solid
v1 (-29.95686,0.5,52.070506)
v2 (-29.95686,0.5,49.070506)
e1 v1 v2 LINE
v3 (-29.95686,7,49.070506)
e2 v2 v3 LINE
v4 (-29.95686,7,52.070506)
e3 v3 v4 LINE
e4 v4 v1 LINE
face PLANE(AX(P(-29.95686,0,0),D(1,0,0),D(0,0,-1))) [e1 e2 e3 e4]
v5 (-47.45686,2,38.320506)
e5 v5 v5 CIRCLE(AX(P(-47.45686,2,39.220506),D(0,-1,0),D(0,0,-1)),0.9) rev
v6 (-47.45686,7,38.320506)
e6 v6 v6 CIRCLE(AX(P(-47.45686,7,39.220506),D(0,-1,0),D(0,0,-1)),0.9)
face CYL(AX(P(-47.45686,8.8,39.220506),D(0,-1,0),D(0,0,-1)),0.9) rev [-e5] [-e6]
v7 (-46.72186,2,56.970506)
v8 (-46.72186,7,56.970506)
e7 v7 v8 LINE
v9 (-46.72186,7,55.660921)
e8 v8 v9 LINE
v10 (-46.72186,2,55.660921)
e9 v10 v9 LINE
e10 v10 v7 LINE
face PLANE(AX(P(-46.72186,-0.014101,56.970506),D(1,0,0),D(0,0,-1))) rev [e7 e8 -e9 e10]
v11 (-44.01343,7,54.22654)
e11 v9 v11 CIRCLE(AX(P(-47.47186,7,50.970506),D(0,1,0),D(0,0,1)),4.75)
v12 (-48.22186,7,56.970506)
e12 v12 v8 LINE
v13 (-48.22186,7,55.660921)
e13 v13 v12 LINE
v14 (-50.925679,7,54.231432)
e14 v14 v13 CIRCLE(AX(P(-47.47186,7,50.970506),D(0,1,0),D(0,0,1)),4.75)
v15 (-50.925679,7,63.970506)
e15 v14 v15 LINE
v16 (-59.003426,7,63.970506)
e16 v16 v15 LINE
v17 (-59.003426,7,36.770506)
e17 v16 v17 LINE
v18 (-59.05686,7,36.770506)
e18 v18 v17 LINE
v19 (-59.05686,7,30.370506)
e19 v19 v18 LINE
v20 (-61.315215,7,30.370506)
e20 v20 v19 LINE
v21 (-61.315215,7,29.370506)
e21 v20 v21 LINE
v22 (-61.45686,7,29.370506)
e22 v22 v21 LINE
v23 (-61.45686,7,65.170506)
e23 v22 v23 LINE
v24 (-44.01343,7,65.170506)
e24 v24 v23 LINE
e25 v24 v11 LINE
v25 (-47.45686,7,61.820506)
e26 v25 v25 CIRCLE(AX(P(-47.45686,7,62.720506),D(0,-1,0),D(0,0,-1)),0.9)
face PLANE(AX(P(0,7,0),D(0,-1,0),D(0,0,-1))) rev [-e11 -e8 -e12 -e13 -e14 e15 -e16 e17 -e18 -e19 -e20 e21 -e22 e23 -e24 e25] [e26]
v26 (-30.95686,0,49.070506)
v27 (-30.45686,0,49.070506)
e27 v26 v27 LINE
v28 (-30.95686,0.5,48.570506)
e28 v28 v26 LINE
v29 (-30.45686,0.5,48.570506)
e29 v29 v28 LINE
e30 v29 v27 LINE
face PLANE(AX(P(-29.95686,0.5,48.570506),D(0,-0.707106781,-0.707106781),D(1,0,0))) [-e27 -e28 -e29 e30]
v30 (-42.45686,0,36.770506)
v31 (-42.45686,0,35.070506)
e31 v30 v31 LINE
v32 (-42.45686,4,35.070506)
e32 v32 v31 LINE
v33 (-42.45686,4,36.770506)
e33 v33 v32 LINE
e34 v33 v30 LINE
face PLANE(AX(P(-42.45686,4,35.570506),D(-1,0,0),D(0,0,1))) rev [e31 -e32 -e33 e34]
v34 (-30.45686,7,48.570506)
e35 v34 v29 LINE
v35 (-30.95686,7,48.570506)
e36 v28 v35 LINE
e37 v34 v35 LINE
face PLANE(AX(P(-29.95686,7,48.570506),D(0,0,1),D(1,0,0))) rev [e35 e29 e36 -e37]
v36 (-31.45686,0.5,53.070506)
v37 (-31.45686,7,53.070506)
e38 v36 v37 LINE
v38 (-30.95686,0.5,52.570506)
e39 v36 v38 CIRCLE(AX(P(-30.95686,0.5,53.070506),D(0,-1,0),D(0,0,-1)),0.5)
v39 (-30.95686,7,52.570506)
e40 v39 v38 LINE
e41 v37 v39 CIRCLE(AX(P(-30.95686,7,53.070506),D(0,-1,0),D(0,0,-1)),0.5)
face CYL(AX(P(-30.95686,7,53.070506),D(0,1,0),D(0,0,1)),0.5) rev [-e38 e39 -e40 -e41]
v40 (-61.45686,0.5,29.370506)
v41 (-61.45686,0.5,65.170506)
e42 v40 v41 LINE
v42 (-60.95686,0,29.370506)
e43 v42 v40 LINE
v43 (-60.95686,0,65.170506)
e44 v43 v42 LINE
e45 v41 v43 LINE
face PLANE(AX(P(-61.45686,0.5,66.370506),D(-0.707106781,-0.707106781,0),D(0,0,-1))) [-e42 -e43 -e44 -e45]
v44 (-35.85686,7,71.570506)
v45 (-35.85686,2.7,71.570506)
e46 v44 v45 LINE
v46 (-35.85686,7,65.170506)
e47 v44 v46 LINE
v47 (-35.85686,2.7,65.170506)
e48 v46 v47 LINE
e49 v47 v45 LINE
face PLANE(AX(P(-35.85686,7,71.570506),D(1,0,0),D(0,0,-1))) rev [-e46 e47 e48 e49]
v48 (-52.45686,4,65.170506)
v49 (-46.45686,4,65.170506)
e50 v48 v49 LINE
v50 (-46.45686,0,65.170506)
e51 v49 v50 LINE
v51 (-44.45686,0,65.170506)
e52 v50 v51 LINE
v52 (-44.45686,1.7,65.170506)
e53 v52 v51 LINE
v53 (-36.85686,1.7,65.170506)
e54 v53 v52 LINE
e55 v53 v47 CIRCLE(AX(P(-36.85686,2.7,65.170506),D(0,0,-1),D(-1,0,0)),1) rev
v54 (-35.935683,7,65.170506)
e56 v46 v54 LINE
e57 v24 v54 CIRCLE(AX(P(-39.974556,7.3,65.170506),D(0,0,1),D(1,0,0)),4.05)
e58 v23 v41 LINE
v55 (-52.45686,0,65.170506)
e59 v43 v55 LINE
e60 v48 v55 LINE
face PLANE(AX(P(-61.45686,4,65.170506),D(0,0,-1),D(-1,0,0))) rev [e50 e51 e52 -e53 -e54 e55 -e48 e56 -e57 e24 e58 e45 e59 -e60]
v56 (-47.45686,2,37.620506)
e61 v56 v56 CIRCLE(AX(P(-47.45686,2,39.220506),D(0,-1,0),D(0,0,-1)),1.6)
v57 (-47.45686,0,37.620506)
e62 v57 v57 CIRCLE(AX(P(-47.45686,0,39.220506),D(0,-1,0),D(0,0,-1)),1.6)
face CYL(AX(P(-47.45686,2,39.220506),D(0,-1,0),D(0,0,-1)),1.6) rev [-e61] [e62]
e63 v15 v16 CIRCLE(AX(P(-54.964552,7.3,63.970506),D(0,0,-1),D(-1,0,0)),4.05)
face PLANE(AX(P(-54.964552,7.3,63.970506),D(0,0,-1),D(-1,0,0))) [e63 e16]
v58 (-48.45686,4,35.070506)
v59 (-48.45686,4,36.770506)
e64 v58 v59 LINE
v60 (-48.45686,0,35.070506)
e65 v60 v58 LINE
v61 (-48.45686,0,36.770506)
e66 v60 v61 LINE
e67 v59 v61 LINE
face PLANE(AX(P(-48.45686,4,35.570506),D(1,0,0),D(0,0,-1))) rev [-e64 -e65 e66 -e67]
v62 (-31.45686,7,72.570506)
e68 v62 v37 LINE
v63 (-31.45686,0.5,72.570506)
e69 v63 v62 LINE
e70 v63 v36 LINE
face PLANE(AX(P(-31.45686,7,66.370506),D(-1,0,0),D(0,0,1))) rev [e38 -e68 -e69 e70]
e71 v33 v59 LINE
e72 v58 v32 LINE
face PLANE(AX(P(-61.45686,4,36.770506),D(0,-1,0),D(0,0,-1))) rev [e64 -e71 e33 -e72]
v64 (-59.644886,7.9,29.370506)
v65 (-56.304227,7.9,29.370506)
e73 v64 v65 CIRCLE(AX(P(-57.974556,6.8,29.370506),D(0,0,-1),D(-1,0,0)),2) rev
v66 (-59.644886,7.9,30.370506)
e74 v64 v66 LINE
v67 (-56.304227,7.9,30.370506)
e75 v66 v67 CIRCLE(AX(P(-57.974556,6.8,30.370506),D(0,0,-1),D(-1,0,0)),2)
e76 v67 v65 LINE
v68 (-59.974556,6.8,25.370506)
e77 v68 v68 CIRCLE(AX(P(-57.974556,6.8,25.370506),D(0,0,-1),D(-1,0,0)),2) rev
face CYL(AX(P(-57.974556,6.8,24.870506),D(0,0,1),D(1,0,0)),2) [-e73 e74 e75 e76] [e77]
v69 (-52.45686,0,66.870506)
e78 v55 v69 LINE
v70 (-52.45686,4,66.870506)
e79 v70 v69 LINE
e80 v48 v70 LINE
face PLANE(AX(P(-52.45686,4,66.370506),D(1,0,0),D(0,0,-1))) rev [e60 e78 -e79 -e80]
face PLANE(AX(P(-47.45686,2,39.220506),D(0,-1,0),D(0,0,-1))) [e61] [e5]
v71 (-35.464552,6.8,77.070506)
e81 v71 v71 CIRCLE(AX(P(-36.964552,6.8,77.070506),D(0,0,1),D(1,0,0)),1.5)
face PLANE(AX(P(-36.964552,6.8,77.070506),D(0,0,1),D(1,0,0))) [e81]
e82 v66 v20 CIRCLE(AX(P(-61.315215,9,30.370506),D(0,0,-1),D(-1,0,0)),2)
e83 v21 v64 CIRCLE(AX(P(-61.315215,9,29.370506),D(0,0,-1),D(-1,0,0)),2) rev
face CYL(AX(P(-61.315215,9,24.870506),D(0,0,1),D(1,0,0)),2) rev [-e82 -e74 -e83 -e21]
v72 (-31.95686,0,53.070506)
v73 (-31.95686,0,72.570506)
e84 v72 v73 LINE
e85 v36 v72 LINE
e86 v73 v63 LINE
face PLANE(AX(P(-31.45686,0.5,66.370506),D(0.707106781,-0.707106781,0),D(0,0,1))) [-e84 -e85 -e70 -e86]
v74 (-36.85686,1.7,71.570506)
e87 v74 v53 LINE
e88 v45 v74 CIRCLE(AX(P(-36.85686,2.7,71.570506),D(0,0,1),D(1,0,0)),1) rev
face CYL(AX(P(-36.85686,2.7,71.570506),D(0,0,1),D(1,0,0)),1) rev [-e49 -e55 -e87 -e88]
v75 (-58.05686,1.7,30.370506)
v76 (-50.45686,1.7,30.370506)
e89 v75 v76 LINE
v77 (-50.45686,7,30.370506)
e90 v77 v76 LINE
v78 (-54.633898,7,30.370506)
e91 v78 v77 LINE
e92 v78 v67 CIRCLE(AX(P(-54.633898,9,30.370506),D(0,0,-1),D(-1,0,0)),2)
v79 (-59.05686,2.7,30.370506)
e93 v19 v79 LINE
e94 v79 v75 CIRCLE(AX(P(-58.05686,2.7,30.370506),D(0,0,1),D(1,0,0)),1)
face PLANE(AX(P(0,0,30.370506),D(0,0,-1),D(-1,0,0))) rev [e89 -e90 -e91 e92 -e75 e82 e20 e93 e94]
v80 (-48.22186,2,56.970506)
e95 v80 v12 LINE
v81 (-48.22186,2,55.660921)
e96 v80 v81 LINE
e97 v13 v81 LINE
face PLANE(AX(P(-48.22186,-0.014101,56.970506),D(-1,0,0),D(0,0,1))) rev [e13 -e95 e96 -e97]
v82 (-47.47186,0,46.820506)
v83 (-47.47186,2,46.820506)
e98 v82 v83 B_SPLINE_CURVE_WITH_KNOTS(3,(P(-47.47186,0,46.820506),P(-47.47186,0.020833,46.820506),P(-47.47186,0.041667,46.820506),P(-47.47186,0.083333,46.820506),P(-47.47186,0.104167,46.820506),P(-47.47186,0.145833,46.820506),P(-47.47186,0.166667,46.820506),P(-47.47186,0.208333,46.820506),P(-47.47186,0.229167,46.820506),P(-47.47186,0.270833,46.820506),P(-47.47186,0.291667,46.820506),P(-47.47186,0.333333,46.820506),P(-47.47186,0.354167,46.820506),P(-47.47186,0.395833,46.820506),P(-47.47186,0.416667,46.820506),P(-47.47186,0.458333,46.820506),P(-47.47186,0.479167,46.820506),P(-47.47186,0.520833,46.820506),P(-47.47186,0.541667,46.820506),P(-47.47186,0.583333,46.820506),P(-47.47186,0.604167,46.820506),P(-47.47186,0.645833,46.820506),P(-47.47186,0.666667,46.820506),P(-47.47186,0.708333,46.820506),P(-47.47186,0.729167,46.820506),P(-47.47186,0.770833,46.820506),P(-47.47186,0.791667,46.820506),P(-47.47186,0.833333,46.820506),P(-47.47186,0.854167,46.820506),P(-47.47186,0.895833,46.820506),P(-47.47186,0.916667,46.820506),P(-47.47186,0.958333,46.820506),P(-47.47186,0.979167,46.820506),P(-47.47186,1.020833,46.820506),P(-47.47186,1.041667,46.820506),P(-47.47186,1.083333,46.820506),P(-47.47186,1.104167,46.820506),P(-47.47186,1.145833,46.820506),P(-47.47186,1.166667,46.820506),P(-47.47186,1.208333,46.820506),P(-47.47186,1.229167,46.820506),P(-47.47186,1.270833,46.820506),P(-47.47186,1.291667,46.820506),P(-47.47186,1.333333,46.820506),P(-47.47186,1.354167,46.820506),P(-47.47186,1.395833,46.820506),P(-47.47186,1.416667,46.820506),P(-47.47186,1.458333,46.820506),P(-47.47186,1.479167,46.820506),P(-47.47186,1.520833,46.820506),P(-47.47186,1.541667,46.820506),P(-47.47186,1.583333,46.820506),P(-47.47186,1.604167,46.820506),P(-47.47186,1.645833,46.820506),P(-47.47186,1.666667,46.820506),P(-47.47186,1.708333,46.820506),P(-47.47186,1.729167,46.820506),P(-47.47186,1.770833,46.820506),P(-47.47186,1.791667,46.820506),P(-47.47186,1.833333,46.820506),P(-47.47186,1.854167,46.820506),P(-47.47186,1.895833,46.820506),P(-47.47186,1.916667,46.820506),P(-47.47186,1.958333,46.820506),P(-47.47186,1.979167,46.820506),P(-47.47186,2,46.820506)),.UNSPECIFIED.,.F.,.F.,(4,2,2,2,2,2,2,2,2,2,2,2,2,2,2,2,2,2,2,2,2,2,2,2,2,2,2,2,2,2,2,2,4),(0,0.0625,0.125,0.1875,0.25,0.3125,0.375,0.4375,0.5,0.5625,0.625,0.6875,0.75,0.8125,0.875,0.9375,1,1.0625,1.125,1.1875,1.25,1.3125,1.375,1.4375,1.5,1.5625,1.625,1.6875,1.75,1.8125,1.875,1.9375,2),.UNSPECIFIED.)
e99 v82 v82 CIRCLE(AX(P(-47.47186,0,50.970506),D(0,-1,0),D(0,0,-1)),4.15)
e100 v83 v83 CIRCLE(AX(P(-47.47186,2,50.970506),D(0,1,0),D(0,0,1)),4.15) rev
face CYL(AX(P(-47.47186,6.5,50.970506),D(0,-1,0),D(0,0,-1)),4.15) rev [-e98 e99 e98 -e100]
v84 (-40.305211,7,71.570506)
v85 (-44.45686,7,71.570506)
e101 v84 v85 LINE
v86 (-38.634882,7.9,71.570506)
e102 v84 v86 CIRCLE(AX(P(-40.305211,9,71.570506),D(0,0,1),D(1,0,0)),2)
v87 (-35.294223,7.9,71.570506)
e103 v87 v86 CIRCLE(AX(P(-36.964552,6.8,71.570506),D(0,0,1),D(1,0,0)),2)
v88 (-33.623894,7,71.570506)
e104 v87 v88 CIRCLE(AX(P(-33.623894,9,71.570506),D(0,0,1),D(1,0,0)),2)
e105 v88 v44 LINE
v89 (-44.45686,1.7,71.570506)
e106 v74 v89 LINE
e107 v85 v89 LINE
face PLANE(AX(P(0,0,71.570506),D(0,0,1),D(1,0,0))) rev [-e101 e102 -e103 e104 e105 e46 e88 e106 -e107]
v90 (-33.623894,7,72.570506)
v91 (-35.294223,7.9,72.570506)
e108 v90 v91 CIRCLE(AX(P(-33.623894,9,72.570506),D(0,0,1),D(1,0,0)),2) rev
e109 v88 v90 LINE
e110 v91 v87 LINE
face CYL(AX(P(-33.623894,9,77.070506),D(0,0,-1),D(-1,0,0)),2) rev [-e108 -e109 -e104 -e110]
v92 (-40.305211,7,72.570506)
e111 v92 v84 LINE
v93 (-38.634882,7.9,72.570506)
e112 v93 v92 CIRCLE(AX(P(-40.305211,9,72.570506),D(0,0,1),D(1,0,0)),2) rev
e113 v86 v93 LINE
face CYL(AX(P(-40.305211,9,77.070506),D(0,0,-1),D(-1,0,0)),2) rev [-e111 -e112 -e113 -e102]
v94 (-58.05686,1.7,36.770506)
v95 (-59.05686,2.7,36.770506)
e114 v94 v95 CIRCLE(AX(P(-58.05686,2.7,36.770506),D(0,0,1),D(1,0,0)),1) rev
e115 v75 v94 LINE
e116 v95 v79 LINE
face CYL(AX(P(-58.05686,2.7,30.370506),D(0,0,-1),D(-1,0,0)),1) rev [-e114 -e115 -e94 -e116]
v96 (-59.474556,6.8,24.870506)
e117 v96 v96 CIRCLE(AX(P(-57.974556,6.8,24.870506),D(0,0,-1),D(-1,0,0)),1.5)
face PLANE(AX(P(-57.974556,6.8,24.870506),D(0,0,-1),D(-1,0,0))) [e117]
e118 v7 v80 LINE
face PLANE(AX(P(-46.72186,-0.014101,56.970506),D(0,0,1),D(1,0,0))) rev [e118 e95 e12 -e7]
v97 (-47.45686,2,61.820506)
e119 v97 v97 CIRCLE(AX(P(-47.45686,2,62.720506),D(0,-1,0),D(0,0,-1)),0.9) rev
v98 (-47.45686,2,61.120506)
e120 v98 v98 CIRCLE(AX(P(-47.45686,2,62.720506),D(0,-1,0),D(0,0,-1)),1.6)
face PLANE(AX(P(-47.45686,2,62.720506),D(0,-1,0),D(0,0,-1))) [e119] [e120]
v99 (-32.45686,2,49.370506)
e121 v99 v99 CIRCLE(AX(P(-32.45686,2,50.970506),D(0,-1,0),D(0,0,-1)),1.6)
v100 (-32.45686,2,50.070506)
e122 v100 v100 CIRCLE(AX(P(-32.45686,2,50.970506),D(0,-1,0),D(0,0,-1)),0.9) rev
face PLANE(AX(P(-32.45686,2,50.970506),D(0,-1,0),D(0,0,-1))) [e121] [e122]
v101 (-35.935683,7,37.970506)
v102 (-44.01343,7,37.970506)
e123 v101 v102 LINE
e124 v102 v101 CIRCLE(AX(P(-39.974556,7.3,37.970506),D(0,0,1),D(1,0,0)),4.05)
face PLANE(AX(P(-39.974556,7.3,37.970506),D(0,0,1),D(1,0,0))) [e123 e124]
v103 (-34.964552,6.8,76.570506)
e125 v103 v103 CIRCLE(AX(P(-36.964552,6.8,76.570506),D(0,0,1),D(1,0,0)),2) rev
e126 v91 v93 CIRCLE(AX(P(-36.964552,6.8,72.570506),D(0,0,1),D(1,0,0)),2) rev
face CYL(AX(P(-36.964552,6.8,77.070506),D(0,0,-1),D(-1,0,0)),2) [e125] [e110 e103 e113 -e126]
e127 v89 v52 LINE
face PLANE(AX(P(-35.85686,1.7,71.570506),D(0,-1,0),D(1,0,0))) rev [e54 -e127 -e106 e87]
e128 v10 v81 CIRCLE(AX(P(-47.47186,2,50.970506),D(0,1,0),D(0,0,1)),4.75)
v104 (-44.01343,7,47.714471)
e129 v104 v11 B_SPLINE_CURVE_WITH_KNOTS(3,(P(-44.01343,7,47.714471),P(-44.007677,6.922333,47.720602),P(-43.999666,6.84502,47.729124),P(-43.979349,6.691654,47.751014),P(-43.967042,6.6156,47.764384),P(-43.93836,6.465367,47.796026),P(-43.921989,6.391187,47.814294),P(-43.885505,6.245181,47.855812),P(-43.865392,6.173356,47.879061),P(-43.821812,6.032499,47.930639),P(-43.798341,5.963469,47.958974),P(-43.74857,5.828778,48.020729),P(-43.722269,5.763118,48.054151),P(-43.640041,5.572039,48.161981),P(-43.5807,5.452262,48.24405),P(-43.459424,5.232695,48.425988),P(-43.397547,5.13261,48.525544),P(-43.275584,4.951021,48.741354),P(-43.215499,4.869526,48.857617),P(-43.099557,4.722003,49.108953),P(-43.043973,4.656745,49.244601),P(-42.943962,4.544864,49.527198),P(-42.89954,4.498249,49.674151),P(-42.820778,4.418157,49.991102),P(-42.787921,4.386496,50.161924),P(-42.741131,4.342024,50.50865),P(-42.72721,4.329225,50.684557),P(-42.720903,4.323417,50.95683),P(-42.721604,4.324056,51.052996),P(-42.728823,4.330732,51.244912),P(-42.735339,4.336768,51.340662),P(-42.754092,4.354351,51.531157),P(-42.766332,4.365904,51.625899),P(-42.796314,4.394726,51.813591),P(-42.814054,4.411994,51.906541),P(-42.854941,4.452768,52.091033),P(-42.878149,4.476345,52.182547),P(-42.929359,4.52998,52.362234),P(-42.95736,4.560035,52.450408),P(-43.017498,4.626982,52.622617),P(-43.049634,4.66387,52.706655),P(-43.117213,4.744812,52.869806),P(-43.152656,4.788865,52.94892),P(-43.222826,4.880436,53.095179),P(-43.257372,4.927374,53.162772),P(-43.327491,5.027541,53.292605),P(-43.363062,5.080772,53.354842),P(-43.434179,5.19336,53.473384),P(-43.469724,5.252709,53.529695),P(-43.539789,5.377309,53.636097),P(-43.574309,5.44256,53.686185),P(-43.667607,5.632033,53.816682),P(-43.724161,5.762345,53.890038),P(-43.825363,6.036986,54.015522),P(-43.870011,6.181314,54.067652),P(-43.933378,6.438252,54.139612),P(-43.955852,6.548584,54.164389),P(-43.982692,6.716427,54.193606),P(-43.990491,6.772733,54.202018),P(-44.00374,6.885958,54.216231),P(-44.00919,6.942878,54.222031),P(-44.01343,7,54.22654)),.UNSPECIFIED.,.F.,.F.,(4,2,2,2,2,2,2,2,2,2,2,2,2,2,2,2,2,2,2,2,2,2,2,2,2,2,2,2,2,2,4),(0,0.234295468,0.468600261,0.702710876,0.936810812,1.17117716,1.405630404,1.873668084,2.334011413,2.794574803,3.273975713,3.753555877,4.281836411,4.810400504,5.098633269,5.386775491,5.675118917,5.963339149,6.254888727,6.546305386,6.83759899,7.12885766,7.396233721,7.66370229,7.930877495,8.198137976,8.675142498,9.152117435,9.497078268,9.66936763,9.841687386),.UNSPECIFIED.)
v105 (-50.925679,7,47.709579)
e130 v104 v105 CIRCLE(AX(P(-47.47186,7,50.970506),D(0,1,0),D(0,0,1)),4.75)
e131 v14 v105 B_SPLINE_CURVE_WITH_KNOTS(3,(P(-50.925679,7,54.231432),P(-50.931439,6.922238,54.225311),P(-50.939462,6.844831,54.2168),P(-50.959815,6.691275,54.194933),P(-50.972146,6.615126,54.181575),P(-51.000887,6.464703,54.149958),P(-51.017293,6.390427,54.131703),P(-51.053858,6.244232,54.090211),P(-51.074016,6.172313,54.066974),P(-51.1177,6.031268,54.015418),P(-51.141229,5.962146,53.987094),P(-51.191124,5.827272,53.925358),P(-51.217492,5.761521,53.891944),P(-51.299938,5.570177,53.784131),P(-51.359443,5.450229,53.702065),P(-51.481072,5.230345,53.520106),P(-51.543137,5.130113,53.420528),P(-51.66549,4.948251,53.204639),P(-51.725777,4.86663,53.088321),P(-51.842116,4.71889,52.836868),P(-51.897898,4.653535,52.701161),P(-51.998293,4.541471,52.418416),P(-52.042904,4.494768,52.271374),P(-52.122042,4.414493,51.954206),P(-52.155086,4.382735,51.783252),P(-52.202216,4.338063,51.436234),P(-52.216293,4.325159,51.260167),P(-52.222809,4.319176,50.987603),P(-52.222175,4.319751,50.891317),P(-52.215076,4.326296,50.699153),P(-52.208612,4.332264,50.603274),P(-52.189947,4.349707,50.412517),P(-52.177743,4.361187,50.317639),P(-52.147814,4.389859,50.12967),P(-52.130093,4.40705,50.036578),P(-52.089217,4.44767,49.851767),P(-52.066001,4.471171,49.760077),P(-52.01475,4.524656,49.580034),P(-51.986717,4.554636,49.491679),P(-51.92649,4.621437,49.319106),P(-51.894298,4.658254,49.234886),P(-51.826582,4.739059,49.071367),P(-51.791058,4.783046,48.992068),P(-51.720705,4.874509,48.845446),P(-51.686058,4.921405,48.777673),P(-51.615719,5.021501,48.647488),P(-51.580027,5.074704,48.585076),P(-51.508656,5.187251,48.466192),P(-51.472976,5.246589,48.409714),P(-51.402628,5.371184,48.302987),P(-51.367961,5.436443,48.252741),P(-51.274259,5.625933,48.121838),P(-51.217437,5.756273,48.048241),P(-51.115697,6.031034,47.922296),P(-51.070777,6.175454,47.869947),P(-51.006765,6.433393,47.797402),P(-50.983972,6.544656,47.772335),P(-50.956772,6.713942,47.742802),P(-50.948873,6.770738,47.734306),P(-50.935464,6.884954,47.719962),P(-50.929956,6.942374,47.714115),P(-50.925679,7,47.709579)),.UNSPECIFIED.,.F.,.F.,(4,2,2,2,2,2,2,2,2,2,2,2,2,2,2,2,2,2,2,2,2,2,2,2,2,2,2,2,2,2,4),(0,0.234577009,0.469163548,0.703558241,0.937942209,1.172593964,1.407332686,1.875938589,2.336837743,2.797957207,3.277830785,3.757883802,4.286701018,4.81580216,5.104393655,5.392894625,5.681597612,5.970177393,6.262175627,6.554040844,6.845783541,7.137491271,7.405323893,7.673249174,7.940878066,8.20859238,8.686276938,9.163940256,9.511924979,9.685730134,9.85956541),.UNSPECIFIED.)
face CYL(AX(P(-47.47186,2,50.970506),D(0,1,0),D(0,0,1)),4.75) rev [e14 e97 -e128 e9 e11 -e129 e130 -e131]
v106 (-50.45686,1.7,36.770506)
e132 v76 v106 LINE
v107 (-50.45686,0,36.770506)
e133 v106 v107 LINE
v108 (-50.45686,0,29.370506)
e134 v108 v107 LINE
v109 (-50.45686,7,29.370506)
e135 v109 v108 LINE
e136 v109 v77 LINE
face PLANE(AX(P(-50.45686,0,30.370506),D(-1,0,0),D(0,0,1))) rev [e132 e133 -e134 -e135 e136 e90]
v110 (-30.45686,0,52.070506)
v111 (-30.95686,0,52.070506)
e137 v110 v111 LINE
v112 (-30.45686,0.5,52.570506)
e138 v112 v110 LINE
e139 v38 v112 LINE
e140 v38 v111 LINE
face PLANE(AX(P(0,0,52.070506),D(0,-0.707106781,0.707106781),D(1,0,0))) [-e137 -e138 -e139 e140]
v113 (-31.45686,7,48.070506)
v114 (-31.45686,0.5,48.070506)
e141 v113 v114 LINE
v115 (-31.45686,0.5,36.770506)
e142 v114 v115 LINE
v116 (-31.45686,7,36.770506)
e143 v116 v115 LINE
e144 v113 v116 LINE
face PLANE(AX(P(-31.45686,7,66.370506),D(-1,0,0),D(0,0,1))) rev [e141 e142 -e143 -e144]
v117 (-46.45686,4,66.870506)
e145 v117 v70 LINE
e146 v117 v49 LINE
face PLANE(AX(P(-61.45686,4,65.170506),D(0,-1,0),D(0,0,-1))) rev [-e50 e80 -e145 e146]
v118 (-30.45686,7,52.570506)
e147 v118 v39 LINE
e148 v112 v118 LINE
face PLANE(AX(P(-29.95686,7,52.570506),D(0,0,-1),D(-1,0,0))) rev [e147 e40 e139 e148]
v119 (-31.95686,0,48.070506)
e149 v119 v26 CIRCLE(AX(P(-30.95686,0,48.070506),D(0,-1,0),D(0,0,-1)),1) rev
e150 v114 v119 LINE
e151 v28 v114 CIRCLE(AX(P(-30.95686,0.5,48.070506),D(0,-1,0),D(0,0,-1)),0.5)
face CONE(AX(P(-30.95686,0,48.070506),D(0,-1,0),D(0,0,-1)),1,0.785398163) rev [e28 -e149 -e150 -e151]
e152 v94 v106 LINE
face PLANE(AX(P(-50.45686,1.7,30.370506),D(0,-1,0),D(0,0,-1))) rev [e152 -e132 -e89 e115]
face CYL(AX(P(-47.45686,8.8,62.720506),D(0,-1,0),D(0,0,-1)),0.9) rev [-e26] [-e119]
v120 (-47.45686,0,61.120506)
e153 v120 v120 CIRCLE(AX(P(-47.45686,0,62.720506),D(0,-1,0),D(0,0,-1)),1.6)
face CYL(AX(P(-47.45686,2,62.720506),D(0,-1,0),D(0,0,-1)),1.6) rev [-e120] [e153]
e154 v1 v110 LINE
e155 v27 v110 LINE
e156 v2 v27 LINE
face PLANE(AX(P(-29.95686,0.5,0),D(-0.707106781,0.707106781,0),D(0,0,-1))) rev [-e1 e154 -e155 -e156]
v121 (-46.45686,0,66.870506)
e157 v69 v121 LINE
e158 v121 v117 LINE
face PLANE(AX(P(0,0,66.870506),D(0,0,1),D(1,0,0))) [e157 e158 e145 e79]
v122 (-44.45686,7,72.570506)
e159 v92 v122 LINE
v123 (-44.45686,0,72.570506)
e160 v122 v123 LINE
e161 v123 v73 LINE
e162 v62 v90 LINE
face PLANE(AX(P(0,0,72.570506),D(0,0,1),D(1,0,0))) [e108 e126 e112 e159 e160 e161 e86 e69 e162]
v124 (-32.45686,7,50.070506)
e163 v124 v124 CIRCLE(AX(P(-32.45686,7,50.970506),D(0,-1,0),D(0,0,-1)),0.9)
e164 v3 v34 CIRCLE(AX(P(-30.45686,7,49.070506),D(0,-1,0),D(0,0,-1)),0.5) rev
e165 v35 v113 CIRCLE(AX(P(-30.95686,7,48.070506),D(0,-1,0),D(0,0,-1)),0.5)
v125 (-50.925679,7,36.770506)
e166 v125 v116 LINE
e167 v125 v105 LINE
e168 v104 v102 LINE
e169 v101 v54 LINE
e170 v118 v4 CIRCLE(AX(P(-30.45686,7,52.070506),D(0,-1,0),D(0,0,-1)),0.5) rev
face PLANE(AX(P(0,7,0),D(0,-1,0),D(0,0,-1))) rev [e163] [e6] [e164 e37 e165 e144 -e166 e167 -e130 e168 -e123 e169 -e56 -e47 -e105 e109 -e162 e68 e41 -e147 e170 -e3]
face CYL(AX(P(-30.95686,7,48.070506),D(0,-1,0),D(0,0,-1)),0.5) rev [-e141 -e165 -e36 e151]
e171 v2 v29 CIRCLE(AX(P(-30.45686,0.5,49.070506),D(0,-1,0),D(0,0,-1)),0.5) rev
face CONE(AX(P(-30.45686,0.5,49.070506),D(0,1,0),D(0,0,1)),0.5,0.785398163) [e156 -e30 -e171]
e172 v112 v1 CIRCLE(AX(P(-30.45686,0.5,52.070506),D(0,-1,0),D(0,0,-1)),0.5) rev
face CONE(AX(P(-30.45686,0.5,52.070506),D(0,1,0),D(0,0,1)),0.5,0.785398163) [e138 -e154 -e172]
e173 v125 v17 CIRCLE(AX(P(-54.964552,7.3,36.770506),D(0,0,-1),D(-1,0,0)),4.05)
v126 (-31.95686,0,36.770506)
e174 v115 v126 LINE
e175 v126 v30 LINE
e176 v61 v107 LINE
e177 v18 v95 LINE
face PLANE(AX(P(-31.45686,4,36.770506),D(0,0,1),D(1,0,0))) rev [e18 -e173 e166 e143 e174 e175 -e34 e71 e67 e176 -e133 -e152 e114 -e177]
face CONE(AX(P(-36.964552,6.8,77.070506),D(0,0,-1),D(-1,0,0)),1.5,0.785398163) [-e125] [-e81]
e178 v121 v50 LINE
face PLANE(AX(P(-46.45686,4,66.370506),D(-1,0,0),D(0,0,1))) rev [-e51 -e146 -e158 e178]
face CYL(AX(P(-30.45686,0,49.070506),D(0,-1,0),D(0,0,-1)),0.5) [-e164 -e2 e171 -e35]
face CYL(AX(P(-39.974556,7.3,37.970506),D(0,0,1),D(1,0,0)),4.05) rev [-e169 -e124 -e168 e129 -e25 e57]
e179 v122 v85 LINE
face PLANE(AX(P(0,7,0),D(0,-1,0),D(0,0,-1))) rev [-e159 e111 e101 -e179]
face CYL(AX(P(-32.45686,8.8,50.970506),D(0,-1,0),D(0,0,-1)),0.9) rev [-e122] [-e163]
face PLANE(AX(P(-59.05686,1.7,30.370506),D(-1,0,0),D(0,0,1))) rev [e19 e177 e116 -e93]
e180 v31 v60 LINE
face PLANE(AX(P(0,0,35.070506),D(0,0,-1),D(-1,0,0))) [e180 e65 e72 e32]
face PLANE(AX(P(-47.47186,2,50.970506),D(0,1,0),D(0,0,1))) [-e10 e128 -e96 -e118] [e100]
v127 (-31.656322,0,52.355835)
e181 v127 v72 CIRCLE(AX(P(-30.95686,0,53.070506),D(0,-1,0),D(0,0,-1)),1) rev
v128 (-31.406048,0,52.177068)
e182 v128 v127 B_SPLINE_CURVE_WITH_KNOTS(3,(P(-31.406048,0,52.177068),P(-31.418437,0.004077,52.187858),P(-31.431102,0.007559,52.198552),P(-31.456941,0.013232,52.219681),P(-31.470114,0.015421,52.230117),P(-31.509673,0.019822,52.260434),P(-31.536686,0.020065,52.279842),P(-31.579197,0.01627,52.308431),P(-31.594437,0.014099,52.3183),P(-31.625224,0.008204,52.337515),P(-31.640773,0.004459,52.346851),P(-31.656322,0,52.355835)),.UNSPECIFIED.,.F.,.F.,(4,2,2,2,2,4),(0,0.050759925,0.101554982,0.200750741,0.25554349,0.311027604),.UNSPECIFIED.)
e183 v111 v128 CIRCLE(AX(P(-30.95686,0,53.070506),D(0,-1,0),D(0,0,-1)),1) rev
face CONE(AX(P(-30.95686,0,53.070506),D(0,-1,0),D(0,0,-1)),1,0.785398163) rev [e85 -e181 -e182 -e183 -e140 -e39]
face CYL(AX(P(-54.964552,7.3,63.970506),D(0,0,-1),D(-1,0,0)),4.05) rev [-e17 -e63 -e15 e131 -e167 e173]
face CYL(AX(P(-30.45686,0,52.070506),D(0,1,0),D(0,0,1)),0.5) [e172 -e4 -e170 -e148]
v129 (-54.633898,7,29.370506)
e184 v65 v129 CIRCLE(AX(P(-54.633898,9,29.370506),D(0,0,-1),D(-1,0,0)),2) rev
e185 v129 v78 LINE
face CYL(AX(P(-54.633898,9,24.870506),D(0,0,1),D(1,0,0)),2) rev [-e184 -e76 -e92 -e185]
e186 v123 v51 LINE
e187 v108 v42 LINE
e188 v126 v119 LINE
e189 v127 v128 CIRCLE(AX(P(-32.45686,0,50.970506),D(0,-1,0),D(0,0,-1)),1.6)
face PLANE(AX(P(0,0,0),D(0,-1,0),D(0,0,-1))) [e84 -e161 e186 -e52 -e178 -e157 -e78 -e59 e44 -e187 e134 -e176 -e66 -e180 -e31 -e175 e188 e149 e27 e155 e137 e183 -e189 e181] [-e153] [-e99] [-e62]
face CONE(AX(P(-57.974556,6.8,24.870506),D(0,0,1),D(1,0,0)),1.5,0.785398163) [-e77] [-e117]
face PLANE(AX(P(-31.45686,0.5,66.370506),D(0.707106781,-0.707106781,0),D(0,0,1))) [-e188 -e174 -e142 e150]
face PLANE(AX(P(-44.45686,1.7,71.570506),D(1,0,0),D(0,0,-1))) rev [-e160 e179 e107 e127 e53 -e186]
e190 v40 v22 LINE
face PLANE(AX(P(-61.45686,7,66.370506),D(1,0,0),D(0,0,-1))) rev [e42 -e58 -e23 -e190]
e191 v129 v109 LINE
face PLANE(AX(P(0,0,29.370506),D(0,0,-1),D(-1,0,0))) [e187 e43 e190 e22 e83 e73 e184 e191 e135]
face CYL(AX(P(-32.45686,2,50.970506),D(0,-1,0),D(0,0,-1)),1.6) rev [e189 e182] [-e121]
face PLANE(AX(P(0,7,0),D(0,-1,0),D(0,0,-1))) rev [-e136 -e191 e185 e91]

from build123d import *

# Parameters (mm, degrees)
SKETCH1_W            = 30
SKETCH1_H            = 30.8
BOSS_EXTRUDE1_DEPTH  = 7
SKETCH2_R            = 4.15
CUT_EXTRUDE1_DEPTH   = 6.5
SKETCH3_W            = 15
SKETCH3_H            = 1.2
SKETCH3_W_2          = 9
SKETCH3_W_3          = 11
SKETCH3_W_4          = 13
CUT_EXTRUDE2_DEPTH   = 4
SKETCH4_W            = 30
SKETCH4_H            = 3
CUT_EXTRUDE3_DEPTH   = 1.2
SKETCH5_W            = 30
SKETCH5_H            = 3
CUT_EXTRUDE4_DEPTH   = 1.2
SKETCH6_R            = 4.05
CUT_EXTRUDE5_DEPTH   = 27.2
SKETCH7_R            = 4.05
CUT_EXTRUDE6_DEPTH   = 27.2
SKETCH8_R            = 4.75
CUT_EXTRUDE7_DEPTH   = 5
BOSS_EXTRUDE2_DEPTH  = 6.4
FILLET1_R            = 1
BOSS_EXTRUDE3_DEPTH  = 6.4
FILLET2_R            = 1
SKETCH12_W           = 1.5
SKETCH12_H           = 1.344099237
CUT_EXTRUDE8_DEPTH   = 5
SKETCH13_W           = 13
SKETCH13_H           = 7
BOSS_EXTRUDE4_DEPTH  = 1
SKETCH14_W           = 11
SKETCH14_H           = 7
BOSS_EXTRUDE5_DEPTH  = 1
SKETCH15_R           = 2
BOSS_EXTRUDE8_DEPTH  = 5.5
SKETCH16_R           = 2
BOSS_EXTRUDE9_DEPTH  = 5.5
FILLET3_R            = 2
FILLET4_R            = 2
FILLET5_R            = 2
CHAMFER2_SIZE        = 0.5
CHAMFER3_SIZE        = 0.5
SKETCH17_W           = 4
SKETCH17_H           = 7
BOSS_EXTRUDE10_DEPTH = 1.5
FILLET7_R            = 0.5
SKETCH18_R           = 0.9
CUT_EXTRUDE9_DEPTH   = 99.965895754
SKETCH19_R           = 1.6
CUT_EXTRUDE10_DEPTH  = 2
SKETCH20_R           = 0.9
CUT_EXTRUDE11_DEPTH  = 99.965895754
SKETCH21_R           = 1.6
CUT_EXTRUDE12_DEPTH  = 2
CHAMFER6_SIZE        = 0.5
SKETCH22_W           = 6
SKETCH22_H           = 4
BOSS_EXTRUDE11_DEPTH = 0.5
SKETCH23_W           = 6
SKETCH23_H           = 4
BOSS_EXTRUDE12_DEPTH = 0.5


with BuildPart() as part:
    # Sketch1 → Boss-Extrude1 (new body)
    with BuildSketch(Plane(origin=(0, 0, 0), x_dir=(1, 0, 0), z_dir=(0, 1, 0))):
        with Locations((-46.45686042, -50.970505576)):
            Rectangle(SKETCH1_W, SKETCH1_H)
    extrude(amount=BOSS_EXTRUDE1_DEPTH)

    # Sketch2 → Cut-Extrude1 (cut)
    with BuildSketch(Plane.XZ):
        with Locations(Location((-47.47186042, 50.970505576, 0), (0, 0, 270))):
            Circle(SKETCH2_R)
    extrude(amount=-CUT_EXTRUDE1_DEPTH, mode=Mode.SUBTRACT)

    # Sketch3 → Cut-Extrude2 (cut)
    with BuildSketch(Plane.XZ):
        with Locations((-38.95686042, 65.770505576)):
            Rectangle(SKETCH3_W, SKETCH3_H)
        with Locations((-56.95686042, 65.770505576)):
            Rectangle(SKETCH3_W_2, SKETCH3_H)
        with Locations((-36.95686042, 36.170505576)):
            Rectangle(SKETCH3_W_3, SKETCH3_H)
        with Locations((-54.95686042, 36.170505576)):
            Rectangle(SKETCH3_W_4, SKETCH3_H)
    extrude(amount=-CUT_EXTRUDE2_DEPTH, mode=Mode.SUBTRACT)

    # Sketch4 → Cut-Extrude3 (cut)
    with BuildSketch(Plane.XY.offset(66.370505576)):
        with Locations((-46.45686042, 5.5)):
            Rectangle(SKETCH4_W, SKETCH4_H)
    extrude(amount=-CUT_EXTRUDE3_DEPTH, mode=Mode.SUBTRACT)

    # Sketch5 → Cut-Extrude4 (cut)
    with BuildSketch(Plane(origin=(0, 0, 35.570505576), x_dir=(-1, 0, 0), z_dir=(0, 0, -1))):
        with Locations((46.45686042, 5.5)):
            Rectangle(SKETCH5_W, SKETCH5_H)
    extrude(amount=-CUT_EXTRUDE4_DEPTH, mode=Mode.SUBTRACT)

    # Sketch6 → Cut-Extrude5 (cut)
    with BuildSketch(Plane.XY.offset(65.170505576)):
        with Locations((-39.974556342, 7.3)):
            Circle(SKETCH6_R)
    extrude(amount=-CUT_EXTRUDE5_DEPTH, mode=Mode.SUBTRACT)

    # Sketch7 → Cut-Extrude6 (cut)
    with BuildSketch(Plane(origin=(0, 0, 36.770505576), x_dir=(-1, 0, 0), z_dir=(0, 0, -1))):
        with Locations((54.96455223, 7.3)):
            Circle(SKETCH7_R)
    extrude(amount=-CUT_EXTRUDE6_DEPTH, mode=Mode.SUBTRACT)

    # Sketch8 → Cut-Extrude7 (cut)
    with BuildSketch(Plane(origin=(0, 7, 0), x_dir=(1, 0, 0), z_dir=(0, 1, 0))):
        with Locations(Location((-47.47186042, -50.970505576, 0), (0, 0, 270))):
            Circle(SKETCH8_R)
    extrude(amount=-CUT_EXTRUDE7_DEPTH, mode=Mode.SUBTRACT)

    # Sketch10 → Boss-Extrude2 (add)
    with BuildSketch(Plane.XY.offset(65.170505576)):
        Polygon((-31.45686042, 0), (-31.45686042, 7), (-35.85686042, 7), (-35.85686042, 1.7), (-44.45686042, 1.7), (-44.45686042, 0), align=None)
    extrude(amount=BOSS_EXTRUDE2_DEPTH)

    # Fillet1
    fillet1_edges = [part.edges().sort_by_distance(p)[0] for p in [
        (-35.85686042, 1.7, 68.370505576),
    ]]
    fillet(fillet1_edges, radius=FILLET1_R)

    # Sketch11 → Boss-Extrude3 (add)
    with BuildSketch(Plane(origin=(0, 0, 36.770505576), x_dir=(-1, 0, 0), z_dir=(0, 0, -1))):
        Polygon((61.45686042, 7), (61.45686042, 0), (50.45686042, 0), (50.45686042, 1.7), (59.05686042, 1.7), (59.05686042, 7), align=None)
    extrude(amount=BOSS_EXTRUDE3_DEPTH)

    # Fillet2
    fillet2_edges = [part.edges().sort_by_distance(p)[0] for p in [
        (-59.05686042, 1.7, 33.570505576),
    ]]
    fillet(fillet2_edges, radius=FILLET2_R)

    # Sketch12 → Cut-Extrude8 (cut)
    with BuildSketch(Plane(origin=(0, 7, 0), x_dir=(1, 0, 0), z_dir=(0, 1, 0))):
        with Locations((-47.47186042, -56.298455958)):
            Rectangle(SKETCH12_W, SKETCH12_H)
    extrude(amount=-CUT_EXTRUDE8_DEPTH, mode=Mode.SUBTRACT)

    # Sketch13 → Boss-Extrude4 (add)
    with BuildSketch(Plane.XY.offset(71.570505576)):
        with Locations((-37.95686042, 3.5)):
            Rectangle(SKETCH13_W, SKETCH13_H)
    extrude(amount=BOSS_EXTRUDE4_DEPTH)

    # Sketch14 → Boss-Extrude5 (add)
    with BuildSketch(Plane(origin=(0, 0, 30.370505576), x_dir=(-1, 0, 0), z_dir=(0, 0, -1))):
        with Locations((55.95686042, 3.5)):
            Rectangle(SKETCH14_W, SKETCH14_H)
    extrude(amount=BOSS_EXTRUDE5_DEPTH)

    # Sketch15 → Boss-Extrude8 (add)
    with BuildSketch(Plane.XY.offset(71.570505576)):
        with Locations(Location((-36.96455223, 6.8, 0), (0, 0, 174.260829523))):
            Circle(SKETCH15_R)
    extrude(amount=BOSS_EXTRUDE8_DEPTH)

    # Sketch16 → Boss-Extrude9 (add)
    with BuildSketch(Plane(origin=(0, 0, 30.370505576), x_dir=(-1, 0, 0), z_dir=(0, 0, -1))):
        with Locations(Location((57.974556342, 6.8, 0), (0, 0, 174.260829523))):
            Circle(SKETCH16_R)
    extrude(amount=BOSS_EXTRUDE9_DEPTH)

    # Fillet3
    fillet3_edges = [part.edges().sort_by_distance(p)[0] for p in [
        (-59.964531217, 7, 29.870505576),
    ]]
    fillet(fillet3_edges, radius=FILLET3_R)

    # Fillet4
    # the kernel refuses this fillet: 2 mm, written as the material it adds along each edge
    with BuildSketch(Plane(origin=(-55.984581468, 7, 30.370505576), x_dir=(1.0, 6.770411692114482e-12, 0), z_dir=(0, 0, -1))) as fillet4_piece_1:
        with BuildLine():
            CenterArc((1.350683743, -2), FILLET4_R, 90, 56.632987031)
            ThreePointArc((-0.319645565, -0.9), (-0.105311329, -0.469360383), (0, 0))
            Line((0, 0), (1.350683743, 0))
        make_face()
    extrude(amount=1)

    # Fillet5
    # the kernel refuses this fillet: 2 mm, written as the material it adds along each edge
    with BuildSketch(Plane(origin=(-38.954527104, 7, 71.570505576), x_dir=(-1.0, 6.9854393361833605e-12, 0), z_dir=(0, 0, 1)), Plane(origin=(-34.974577356, 7, 72.570505576), x_dir=(1, 0, 0), z_dir=(0, 0, -1))) as fillet5_piece_1:
        with BuildLine():
            CenterArc((1.350683743, -2), FILLET5_R, 90, 56.632987031)
            ThreePointArc((-0.319645565, -0.9), (-0.105311329, -0.469360383), (0, 0))
            Line((0, 0), (1.350683743, 0))
        make_face()
    extrude(amount=1)

    # Chamfer2
    chamfer2_edges = [part.edges().sort_by_distance(p)[0] for p in [
        (-34.974577356, 6.6, 77.070505576),
    ]]
    chamfer(chamfer2_edges, length=CHAMFER2_SIZE)

    # Chamfer3
    chamfer3_edges = [part.edges().sort_by_distance(p)[0] for p in [
        (-59.964531217, 6.6, 24.870505576),
    ]]
    chamfer(chamfer3_edges, length=CHAMFER3_SIZE)

    # Sketch17 → Boss-Extrude10 (add)
    with BuildSketch(Plane(origin=(-31.45686042, 0, 0), x_dir=(0, 0, -1), z_dir=(1, 0, 0))):
        with Locations((-50.570505576, 3.5)):
            Rectangle(SKETCH17_W, SKETCH17_H)
    extrude(amount=BOSS_EXTRUDE10_DEPTH)

    # Fillet7
    fillet7_edges = [part.edges().sort_by_distance(p)[0] for p in [
        (-31.45686042, 3.5, 52.570505576),
        (-31.45686042, 3.5, 48.570505576),
        (-29.95686042, 3.5, 52.570505576),
        (-29.95686042, 3.5, 48.570505576),
    ]]
    fillet(fillet7_edges, radius=FILLET7_R)

    # Sketch18 → Cut-Extrude9 (cut, through all)
    with BuildSketch(Plane.XZ):
        with Locations(Location((-32.45686042, 50.970505576, 0), (0, 0, 270))):
            Circle(SKETCH18_R)
    extrude(amount=-CUT_EXTRUDE9_DEPTH, mode=Mode.SUBTRACT)

    # Sketch19 → Cut-Extrude10 (cut)
    with BuildSketch(Plane.XZ):
        with Locations(Location((-32.45686042, 50.970505576, 0), (0, 0, 270))):
            Circle(SKETCH19_R)
    extrude(amount=-CUT_EXTRUDE10_DEPTH, mode=Mode.SUBTRACT)

    # Sketch20 → Cut-Extrude11 (cut, through all)
    with BuildSketch(Plane.XZ):
        with Locations(Location((-47.45686042, 62.720505576, 0), (0, 0, 270))):
            Circle(SKETCH20_R)
        with Locations(Location((-47.45686042, 39.220505576, 0), (0, 0, 270))):
            Circle(SKETCH20_R)
    extrude(amount=-CUT_EXTRUDE11_DEPTH, mode=Mode.SUBTRACT)

    # Sketch21 → Cut-Extrude12 (cut)
    with BuildSketch(Plane.XZ):
        with Locations(Location((-47.45686042, 62.720505576, 0), (0, 0, 270))):
            Circle(SKETCH21_R)
        with Locations(Location((-47.45686042, 39.220505576, 0), (0, 0, 270))):
            Circle(SKETCH21_R)
    extrude(amount=-CUT_EXTRUDE12_DEPTH, mode=Mode.SUBTRACT)

    # Chamfer6
    # the kernel refuses this chamfer: 0.5 mm, written as the material it takes off along each edge
    with BuildSketch(Plane(origin=(-61.45686042, 0, 28.084664082), x_dir=(1, 0, 0), z_dir=(0, 0, 1))) as chamfer6_piece_1:
        Polygon((CHAMFER6_SIZE, 0), (0, CHAMFER6_SIZE), (0, 0), align=None)
    extrude(amount=38.371682988, mode=Mode.SUBTRACT)
    with BuildSketch(Plane(origin=(-31.45686042, 0, 53.070505576), x_dir=(-1, 0, 0), z_dir=(0, 0, 1))) as chamfer6_piece_2:
        Polygon((CHAMFER6_SIZE, 0), (0, -CHAMFER6_SIZE), (0, 0), align=None)
    extrude(amount=20.785841494, mode=Mode.SUBTRACT)
    with BuildSketch(Plane(origin=(-30.95686042, 0, 52.570505576), x_dir=(0, 0, -1), z_dir=(1, 0, 0))) as chamfer6_piece_3:
        Polygon((CHAMFER6_SIZE, 0), (0, CHAMFER6_SIZE), (0, 0), align=None)
    extrude(amount=0.5, mode=Mode.SUBTRACT)
    with BuildSketch(Plane(origin=(-29.95686042, 0, 49.070505576), x_dir=(-1, 0, 0), z_dir=(0, 0, 1))) as chamfer6_piece_4:
        Polygon((CHAMFER6_SIZE, 0), (0, -CHAMFER6_SIZE), (0, 0), align=None)
    extrude(amount=3, mode=Mode.SUBTRACT)
    with BuildSketch(Plane(origin=(-31.45686042, 0, 35.484664082), x_dir=(-1, 0, 0), z_dir=(0, 0, 1))) as chamfer6_piece_5:
        Polygon((CHAMFER6_SIZE, 0), (0, -CHAMFER6_SIZE), (0, 0), align=None)
    extrude(amount=12.585841494, mode=Mode.SUBTRACT)
    with BuildSketch(Plane(origin=(-30.95686042, 0, 48.570505576), x_dir=(0, 0, 1), z_dir=(1, 0, 0))) as chamfer6_piece_6:
        Polygon((CHAMFER6_SIZE, 0), (0, -CHAMFER6_SIZE), (0, 0), align=None)
    extrude(amount=0.5, mode=Mode.SUBTRACT)
    with BuildSketch(Plane(origin=(-30.95686042, 0, 53.070505576), x_dir=(-1, 0, 0), z_dir=(0, 0, 1))) as chamfer6_piece_7:
        Polygon((0.5 + CHAMFER6_SIZE, 0), (0.5, -CHAMFER6_SIZE), (0.5, 0), align=None)
    revolve(axis=Axis((-30.95686042, 0, 53.070505576), (0, -1, 0)), revolution_arc=90, mode=Mode.SUBTRACT)
    with BuildSketch(Plane(origin=(-30.95686042, 0, 48.070505576), x_dir=(-1, 0, 0), z_dir=(0, 0, -1))) as chamfer6_piece_8:
        Polygon((0.5 + CHAMFER6_SIZE, 0), (0.5, CHAMFER6_SIZE), (0.5, 0), align=None)
    revolve(axis=Axis((-30.95686042, 0, 48.070505576), (0, 1, 0)), revolution_arc=90, mode=Mode.SUBTRACT)
    with BuildSketch(Plane(origin=(-30.45686042, 0, 49.070505576), x_dir=(0, 0, -1), z_dir=(-1, 0, 0))) as chamfer6_piece_9:
        Polygon((0.5 - CHAMFER6_SIZE, 0), (0.5, -CHAMFER6_SIZE), (0.5, 0), align=None)
    revolve(axis=Axis((-30.45686042, 0, 49.070505576), (0, -1, 0)), revolution_arc=90, mode=Mode.SUBTRACT)
    with BuildSketch(Plane(origin=(-30.45686042, 0, 52.070505576), x_dir=(0, 0, 1), z_dir=(-1, 0, 0))) as chamfer6_piece_10:
        Polygon((0.5 - CHAMFER6_SIZE, 0), (0.5, CHAMFER6_SIZE), (0.5, 0), align=None)
    revolve(axis=Axis((-30.45686042, 0, 52.070505576), (0, 1, 0)), revolution_arc=90, mode=Mode.SUBTRACT)

    # Sketch22 → Boss-Extrude11 (add)
    with BuildSketch(Plane(origin=(0, 0, 35.570505576), x_dir=(-1, 0, 0), z_dir=(0, 0, -1))):
        with Locations((45.45686042, 2)):
            Rectangle(SKETCH22_W, SKETCH22_H)
    extrude(amount=BOSS_EXTRUDE11_DEPTH)

    # Sketch23 → Boss-Extrude12 (add)
    with BuildSketch(Plane.XY.offset(66.370505576)):
        with Locations((-49.45686042, 2)):
            Rectangle(SKETCH23_W, SKETCH23_H)
    extrude(amount=BOSS_EXTRUDE12_DEPTH)


solid = part.part
